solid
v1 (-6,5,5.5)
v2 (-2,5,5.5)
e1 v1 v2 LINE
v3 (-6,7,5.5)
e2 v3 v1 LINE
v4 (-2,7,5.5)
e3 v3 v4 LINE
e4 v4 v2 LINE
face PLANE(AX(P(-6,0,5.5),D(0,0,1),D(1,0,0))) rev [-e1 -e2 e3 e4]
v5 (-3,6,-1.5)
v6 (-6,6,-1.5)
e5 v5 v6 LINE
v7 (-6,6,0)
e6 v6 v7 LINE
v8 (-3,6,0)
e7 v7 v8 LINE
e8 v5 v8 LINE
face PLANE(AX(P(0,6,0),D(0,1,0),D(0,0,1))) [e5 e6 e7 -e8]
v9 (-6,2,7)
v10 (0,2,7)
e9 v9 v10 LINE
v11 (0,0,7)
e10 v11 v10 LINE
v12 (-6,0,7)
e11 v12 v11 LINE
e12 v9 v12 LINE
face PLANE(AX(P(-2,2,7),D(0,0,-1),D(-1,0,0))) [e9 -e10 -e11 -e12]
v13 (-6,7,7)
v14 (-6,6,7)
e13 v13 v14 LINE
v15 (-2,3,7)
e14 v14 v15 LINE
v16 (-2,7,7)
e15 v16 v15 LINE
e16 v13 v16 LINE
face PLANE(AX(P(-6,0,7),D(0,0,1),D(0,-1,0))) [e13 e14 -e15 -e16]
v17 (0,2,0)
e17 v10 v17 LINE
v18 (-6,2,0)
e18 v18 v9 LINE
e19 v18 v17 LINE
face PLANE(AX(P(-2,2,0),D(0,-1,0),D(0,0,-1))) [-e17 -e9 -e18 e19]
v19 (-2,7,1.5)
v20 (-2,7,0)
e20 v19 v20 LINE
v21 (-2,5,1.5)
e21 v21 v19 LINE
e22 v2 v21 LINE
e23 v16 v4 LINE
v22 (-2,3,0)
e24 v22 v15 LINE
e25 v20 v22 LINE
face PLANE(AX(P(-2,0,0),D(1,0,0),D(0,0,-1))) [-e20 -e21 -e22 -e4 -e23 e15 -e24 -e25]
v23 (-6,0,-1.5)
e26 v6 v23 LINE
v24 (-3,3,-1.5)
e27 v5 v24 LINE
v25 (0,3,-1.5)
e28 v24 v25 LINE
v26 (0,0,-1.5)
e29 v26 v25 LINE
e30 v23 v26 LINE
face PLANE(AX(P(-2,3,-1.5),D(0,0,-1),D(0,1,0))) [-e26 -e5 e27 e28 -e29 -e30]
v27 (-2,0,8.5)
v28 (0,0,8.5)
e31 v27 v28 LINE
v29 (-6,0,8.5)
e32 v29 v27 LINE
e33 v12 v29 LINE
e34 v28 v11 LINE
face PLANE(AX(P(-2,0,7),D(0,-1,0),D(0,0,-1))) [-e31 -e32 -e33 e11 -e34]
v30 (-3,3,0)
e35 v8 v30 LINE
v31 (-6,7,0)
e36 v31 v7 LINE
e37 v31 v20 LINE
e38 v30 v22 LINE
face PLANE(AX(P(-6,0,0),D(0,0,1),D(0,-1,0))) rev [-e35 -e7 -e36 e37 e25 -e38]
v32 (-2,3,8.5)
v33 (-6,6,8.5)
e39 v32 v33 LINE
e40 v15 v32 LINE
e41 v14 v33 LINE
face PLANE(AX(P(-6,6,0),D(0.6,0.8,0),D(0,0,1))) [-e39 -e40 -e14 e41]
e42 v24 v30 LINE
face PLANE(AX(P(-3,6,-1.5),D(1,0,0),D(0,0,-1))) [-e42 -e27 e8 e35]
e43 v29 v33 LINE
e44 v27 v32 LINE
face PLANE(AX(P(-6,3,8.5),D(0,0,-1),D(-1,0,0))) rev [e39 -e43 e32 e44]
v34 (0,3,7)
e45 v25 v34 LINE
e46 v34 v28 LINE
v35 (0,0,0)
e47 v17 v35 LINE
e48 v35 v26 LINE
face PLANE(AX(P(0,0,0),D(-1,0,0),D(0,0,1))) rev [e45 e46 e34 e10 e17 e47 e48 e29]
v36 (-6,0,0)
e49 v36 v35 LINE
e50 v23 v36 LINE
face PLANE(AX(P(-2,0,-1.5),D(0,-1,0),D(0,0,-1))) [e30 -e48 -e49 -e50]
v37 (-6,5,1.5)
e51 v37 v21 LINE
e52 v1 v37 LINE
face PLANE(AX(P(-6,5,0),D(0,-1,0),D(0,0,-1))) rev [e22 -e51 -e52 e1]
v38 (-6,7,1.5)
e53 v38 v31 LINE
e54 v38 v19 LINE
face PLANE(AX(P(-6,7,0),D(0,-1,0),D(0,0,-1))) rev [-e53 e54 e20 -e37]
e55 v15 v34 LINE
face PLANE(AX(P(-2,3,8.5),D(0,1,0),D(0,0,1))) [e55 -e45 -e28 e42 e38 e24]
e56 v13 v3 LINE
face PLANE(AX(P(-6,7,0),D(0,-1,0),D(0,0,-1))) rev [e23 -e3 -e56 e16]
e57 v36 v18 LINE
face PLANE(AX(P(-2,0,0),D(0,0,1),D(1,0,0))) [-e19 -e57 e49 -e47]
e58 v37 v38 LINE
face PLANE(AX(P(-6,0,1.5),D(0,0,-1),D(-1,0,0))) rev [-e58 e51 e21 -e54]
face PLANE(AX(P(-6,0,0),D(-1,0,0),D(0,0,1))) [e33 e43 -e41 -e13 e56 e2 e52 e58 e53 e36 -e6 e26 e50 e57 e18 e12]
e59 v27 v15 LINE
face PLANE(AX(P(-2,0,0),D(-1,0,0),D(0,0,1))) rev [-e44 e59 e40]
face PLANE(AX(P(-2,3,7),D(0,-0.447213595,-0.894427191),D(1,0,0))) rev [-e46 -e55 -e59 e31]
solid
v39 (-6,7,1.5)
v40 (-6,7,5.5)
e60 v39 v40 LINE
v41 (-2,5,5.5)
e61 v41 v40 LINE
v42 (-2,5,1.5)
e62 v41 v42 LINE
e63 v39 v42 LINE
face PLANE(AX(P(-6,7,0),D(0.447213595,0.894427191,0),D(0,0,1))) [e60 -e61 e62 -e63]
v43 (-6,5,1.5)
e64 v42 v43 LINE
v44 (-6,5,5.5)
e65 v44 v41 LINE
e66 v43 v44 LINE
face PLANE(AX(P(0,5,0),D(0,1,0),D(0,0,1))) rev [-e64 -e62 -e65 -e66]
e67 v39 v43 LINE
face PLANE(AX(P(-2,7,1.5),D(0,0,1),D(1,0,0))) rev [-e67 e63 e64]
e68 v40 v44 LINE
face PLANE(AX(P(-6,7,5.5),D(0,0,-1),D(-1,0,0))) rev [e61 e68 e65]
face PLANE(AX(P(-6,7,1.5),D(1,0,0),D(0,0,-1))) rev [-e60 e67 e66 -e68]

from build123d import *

# Parameters (mm, degrees)
SALIENTE_EXTRUIR1_DEPTH = 2
CHAFL_N2_SIZE           = 3
CHAFL_N2_SIZE_2         = 1.5
SALIENTE_EXTRUIR2_DEPTH = 4
CROQUIS3_W              = 4
CROQUIS3_H              = 1.5
SALIENTE_EXTRUIR3_DEPTH = 3
CHAFL_N3_SIZE2          = 3
CHAFL_N3_SIZE           = 4
SALIENTE_EXTRUIR4_DEPTH = 4
CROQUIS5_W              = 4
CROQUIS5_H              = 4
SALIENTE_EXTRUIR5_DEPTH = 2
CHAFL_N4_SIZE           = 2
CHAFL_N4_SIZE_2         = 4
CROQUIS6_W              = 3
CROQUIS6_H              = 1.5
SALIENTE_EXTRUIR6_DEPTH = 3


# Some blends are built 0.0001 mm under size
with BuildPart() as part:
    # Croquis1 → Saliente-Extruir1 (new body)
    with BuildSketch(Plane(origin=(0, 0, 0), x_dir=(0, 0, -1), z_dir=(1, 0, 0))):
        Polygon((0, 0), (0, 2), (-7, 2), (-7, 0), (-8.5, 0), (-8.5, 3), (1.5, 3), (1.5, 0), align=None)
    extrude(amount=-SALIENTE_EXTRUIR1_DEPTH)

    # Chaflán2
    # the kernel refuses this chamfer: 3, 1.5 mm, written as the material it takes off along each edge
    with BuildSketch(Plane(origin=(7.769486621, 3, 8.5), x_dir=(0, -0.9998508956747117, 0.017268075123667865), z_dir=(-1, 0, 0))) as chafl_n2_piece_1:
        Polygon((CHAFL_N2_SIZE * 0.999850895675, -CHAFL_N2_SIZE * 0.0172680751237), (-CHAFL_N2_SIZE_2 * 0.0172680751237, -CHAFL_N2_SIZE_2 * 0.999850895675), (0, 0), align=None)
    extrude(amount=17.538973243, mode=Mode.SUBTRACT)

    # Croquis2 → Saliente-Extruir2 (add)
    with BuildSketch(Plane.ZY.offset(2)):
        Polygon((7, 3), (8.5, 3), (8.5, 0), (7, 0), (7, 2), (0, 2), (0, 0), (-1.5, 0), (-1.5, 3), align=None)
    extrude(amount=SALIENTE_EXTRUIR2_DEPTH)

    # Croquis3 → Saliente-Extruir3 (add)
    with BuildSketch(Plane(origin=(0, 3, 0), x_dir=(1, 0, 0), z_dir=(0, 1, 0))):
        with Locations((-4, -7.75)):
            Rectangle(CROQUIS3_W, CROQUIS3_H)
    extrude(amount=SALIENTE_EXTRUIR3_DEPTH)

    # Chaflán3
    chafl_n3_edges = [part.edges().sort_by_distance(p)[0] for p in [
        (-2, 6, 7.75),
    ]]
    chafl_n3_side = [part.faces().sort_by_distance(p)[0] for p in [
        (-2.06, 6, 7.75),
    ]]
    chamfer(chafl_n3_edges, length=CHAFL_N3_SIZE - 0.0001, length2=CHAFL_N3_SIZE2 - 0.0001, reference=chafl_n3_side[0])  # a hair under: the kernel refuses the full size

    # Croquis4 → Saliente-Extruir4 (add)
    with BuildSketch(Plane(origin=(-2, 0, 0), x_dir=(0, 0, -1), z_dir=(1, 0, 0))):
        Polygon((-7, 3), (0, 3), (0, 7), (-1.5, 7), (-1.5, 5), (-5.5, 5), (-5.5, 7), (-7, 7), align=None)
    extrude(amount=-SALIENTE_EXTRUIR4_DEPTH)

    # Croquis6 → Saliente-Extruir6 (add)
    with BuildSketch(Plane(origin=(0, 3, 0), x_dir=(1, 0, 0), z_dir=(0, 1, 0))):
        with Locations((-4.5, 0.75)):
            Rectangle(CROQUIS6_W, CROQUIS6_H)
    extrude(amount=SALIENTE_EXTRUIR6_DEPTH)


with BuildPart() as body_2:
    # Croquis5 → Saliente-Extruir5 (new body)
    with BuildSketch(Plane(origin=(0, 5, 0), x_dir=(1, 0, 0), z_dir=(0, 1, 0))):
        with Locations((-4, -3.5)):
            Rectangle(CROQUIS5_W, CROQUIS5_H)
    extrude(amount=SALIENTE_EXTRUIR5_DEPTH)

    # Chaflán4
    # the kernel refuses this chamfer: 4, 2 mm, written as the material it takes off along each edge
    with BuildSketch(Plane(origin=(-2, 7, 15.859315495), x_dir=(0.06891834360170881, -0.9976223042390326, 0), z_dir=(0, 0, -1))) as chafl_n4_piece_1:
        Polygon((CHAFL_N4_SIZE * 0.997622304239, CHAFL_N4_SIZE * 0.0689183436017), (-CHAFL_N4_SIZE_2 * 0.0689183436017, CHAFL_N4_SIZE_2 * 0.997622304239), (0, 0), align=None)
    extrude(amount=24.71863099, mode=Mode.SUBTRACT)


solid = Compound([part.part, body_2.part])
